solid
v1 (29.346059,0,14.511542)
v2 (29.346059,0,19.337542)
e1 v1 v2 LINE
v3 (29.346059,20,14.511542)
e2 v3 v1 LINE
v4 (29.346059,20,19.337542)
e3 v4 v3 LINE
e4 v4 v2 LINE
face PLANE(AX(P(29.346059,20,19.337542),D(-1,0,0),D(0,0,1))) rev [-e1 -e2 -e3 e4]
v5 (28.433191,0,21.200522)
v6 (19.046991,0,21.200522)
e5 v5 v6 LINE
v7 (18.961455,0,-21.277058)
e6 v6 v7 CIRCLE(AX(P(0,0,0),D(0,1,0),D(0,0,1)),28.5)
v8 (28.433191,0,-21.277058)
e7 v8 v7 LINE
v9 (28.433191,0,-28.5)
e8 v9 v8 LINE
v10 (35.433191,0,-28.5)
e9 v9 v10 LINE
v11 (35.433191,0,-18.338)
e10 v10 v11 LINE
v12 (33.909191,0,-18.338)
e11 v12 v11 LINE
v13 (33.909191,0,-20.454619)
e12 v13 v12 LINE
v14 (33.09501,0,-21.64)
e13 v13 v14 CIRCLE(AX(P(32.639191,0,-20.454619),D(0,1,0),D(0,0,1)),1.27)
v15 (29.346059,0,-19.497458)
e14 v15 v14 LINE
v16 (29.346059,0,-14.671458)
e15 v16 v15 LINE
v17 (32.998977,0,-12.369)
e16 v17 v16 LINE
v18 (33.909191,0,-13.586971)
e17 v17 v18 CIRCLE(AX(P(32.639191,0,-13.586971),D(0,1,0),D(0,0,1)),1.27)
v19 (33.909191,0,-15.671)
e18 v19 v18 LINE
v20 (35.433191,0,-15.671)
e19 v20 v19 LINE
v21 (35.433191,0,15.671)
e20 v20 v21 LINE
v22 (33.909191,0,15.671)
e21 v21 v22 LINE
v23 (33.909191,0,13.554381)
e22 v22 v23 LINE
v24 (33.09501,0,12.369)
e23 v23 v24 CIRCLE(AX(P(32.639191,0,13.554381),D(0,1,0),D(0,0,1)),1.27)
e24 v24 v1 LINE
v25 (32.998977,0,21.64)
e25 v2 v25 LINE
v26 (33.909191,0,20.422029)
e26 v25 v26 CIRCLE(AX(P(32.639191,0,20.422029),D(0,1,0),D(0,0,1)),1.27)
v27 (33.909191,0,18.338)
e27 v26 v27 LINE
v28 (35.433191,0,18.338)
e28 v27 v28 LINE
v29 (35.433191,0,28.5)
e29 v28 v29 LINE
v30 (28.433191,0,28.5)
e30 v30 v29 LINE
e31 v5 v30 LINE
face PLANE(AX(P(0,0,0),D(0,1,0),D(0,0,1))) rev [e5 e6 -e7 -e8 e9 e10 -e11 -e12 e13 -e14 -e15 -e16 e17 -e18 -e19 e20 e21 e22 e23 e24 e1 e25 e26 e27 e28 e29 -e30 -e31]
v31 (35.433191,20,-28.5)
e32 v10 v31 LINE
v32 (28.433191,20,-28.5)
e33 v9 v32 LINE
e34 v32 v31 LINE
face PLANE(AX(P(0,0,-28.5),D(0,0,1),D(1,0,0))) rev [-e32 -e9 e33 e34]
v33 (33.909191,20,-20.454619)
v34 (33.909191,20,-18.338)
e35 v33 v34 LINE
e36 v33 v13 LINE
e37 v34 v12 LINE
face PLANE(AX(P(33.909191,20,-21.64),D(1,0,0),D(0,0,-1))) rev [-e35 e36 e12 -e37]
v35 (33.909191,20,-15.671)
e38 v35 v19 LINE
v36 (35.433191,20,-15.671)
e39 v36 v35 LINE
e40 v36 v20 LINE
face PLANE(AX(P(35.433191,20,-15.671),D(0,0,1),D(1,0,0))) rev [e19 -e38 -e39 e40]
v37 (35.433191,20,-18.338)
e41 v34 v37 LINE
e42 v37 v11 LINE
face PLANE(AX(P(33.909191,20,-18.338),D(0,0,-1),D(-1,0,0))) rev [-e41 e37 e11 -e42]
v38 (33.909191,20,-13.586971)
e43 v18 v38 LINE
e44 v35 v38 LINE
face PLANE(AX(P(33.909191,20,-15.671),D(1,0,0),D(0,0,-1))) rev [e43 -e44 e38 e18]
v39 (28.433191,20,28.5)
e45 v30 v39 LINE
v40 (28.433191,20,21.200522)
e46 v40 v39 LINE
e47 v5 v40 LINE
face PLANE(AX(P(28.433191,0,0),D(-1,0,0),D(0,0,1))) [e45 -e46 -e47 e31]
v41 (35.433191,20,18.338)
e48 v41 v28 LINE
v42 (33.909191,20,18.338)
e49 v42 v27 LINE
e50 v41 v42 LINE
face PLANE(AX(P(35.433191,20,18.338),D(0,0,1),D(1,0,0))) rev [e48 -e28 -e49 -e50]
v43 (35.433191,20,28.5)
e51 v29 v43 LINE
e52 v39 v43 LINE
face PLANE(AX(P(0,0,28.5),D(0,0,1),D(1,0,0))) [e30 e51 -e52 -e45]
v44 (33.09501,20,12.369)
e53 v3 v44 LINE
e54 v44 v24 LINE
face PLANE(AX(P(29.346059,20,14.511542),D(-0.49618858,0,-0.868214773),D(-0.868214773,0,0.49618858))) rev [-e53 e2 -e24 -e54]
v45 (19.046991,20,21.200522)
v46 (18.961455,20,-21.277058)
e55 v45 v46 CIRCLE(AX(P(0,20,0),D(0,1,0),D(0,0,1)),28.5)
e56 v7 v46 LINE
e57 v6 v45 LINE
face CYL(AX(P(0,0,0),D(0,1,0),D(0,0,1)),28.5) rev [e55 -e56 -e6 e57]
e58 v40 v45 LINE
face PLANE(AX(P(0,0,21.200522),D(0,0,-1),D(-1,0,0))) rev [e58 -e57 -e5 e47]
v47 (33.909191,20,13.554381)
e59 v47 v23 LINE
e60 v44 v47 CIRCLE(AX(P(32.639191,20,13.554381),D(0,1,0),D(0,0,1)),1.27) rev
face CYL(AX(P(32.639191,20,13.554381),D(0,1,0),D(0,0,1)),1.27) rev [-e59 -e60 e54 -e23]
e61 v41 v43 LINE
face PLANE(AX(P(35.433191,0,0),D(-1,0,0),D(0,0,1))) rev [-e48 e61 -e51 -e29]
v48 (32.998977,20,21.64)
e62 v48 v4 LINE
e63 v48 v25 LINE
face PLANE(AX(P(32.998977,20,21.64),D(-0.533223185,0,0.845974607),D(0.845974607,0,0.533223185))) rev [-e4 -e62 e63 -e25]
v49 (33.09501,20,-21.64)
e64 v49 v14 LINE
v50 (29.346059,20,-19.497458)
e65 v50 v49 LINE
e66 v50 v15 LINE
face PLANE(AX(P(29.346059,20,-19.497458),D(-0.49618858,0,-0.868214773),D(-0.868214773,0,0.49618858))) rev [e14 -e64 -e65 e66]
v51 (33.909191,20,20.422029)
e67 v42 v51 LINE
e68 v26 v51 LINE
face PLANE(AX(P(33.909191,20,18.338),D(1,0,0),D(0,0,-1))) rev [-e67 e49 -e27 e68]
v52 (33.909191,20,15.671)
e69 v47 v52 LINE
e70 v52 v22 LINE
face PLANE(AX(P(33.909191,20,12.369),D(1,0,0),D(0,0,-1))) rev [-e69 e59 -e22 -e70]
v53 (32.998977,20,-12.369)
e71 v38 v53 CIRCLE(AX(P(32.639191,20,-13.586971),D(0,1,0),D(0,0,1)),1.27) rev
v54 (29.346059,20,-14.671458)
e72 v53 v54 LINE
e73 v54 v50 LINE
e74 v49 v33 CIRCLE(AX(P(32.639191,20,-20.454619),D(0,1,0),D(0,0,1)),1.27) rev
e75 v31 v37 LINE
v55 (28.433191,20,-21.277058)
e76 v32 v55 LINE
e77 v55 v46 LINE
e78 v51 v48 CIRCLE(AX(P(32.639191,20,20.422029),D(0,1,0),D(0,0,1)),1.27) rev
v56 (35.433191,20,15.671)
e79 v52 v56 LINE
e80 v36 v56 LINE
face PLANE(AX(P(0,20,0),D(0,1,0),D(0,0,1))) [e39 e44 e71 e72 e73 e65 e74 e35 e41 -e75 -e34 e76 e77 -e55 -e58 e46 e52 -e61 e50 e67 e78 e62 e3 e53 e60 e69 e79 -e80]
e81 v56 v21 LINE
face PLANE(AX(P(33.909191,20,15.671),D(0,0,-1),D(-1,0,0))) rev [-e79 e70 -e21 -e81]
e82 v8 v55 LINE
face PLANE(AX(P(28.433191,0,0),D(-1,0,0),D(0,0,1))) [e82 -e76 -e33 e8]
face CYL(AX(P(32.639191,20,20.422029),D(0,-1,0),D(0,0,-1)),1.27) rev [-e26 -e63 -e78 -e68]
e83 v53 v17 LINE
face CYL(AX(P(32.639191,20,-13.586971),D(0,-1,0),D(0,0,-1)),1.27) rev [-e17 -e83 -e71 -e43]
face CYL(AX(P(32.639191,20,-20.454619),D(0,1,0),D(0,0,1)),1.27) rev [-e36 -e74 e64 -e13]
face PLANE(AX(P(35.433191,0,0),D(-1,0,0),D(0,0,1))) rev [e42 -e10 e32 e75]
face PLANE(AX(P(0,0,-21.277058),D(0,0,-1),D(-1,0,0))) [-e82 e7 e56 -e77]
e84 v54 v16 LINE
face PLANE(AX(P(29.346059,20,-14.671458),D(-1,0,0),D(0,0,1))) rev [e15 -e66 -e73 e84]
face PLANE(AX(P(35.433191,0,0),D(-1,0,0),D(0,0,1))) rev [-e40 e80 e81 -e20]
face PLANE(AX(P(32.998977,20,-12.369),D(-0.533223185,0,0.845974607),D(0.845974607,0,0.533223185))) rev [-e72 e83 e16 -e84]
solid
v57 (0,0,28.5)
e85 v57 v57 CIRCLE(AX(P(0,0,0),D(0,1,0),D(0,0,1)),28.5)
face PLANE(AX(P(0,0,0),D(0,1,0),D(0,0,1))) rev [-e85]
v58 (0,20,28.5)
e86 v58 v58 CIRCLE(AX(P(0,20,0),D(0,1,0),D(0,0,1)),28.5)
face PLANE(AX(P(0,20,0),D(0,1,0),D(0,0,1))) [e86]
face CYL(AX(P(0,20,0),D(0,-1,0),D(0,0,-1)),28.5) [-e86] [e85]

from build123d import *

# Parameters (mm, degrees)
SKETCH1_R               = 28.5
BOSS_EXTRUDE1_DEPTH     = 20
BOSS_EXTRUDE3_DEPTH     = 20
CUT_EXTRUDE1_DEPTH      = 50.676564409
CUT_EXTRUDE1_DEPTH_BACK = 50.676564409
CUT_EXTRUDE2_DEPTH      = 50.676564409
CUT_EXTRUDE2_DEPTH_BACK = 50.676564409
FILLET1_R               = 1.27


with BuildPart() as part:
    # Sketch1 → Boss-Extrude1 (new body)
    with BuildSketch(Plane(origin=(0, 0, 0), x_dir=(1, 0, 0), z_dir=(0, 1, 0))):
        with Locations(Location((0, 0, 0), (0, 0, 270))):
            Circle(SKETCH1_R)
    extrude(amount=BOSS_EXTRUDE1_DEPTH)


with BuildPart() as body_2:
    # Sketch2 → Boss-Extrude3 (new body)
    with BuildSketch(Plane(origin=(0, 20, 0), x_dir=(1, 0, 0), z_dir=(0, 1, 0))):
        with BuildLine():
            Line((35.433191382, 28.5), (28.433191382, 28.5))
            Line((28.433191382, 28.5), (28.433191382, 21.277058423))
            Line((28.433191382, 21.277058423), (18.961455241, 21.277058423))
            ThreePointArc((18.961455241, 21.277058423), (28.499942219, 0.057389264), (19.046990751, -21.200522242))
            Line((19.046990751, -21.200522242), (28.433191382, -21.200522242))
            Line((28.433191382, -21.200522242), (28.433191382, -28.5))
            Line((28.433191382, -28.5), (35.433191382, -28.5))
            Line((35.433191382, -28.5), (35.433191382, 28.5))
        make_face()
    extrude(amount=-BOSS_EXTRUDE3_DEPTH)

    # Sketch6 → Cut-Extrude1 (cut, two sides: drawn at the far end of the back side and taken through both)
    with BuildSketch(Plane.XZ.offset(-CUT_EXTRUDE1_DEPTH_BACK)):
        Polygon((35.433191382, 18.338), (33.909191382, 18.338), (33.909191382, 21.64), (32.998977436, 21.64), (29.346059083, 19.337542289), (29.346059083, 14.511542289), (33.095010475, 12.369), (33.909191382, 12.369), (33.909191382, 15.671), (35.433191382, 15.671), align=None)
    extrude(amount=CUT_EXTRUDE1_DEPTH + CUT_EXTRUDE1_DEPTH_BACK, mode=Mode.SUBTRACT)

    # Sketch8 → Cut-Extrude2 (cut, two sides: drawn at the far end of the back side and taken through both)
    with BuildSketch(Plane.XZ.offset(-CUT_EXTRUDE2_DEPTH_BACK)):
        Polygon((35.433191382, -15.671), (33.909191382, -15.671), (33.909191382, -12.369), (32.998977436, -12.369), (29.346059083, -14.671457711), (29.346059083, -19.497457711), (33.095010475, -21.64), (33.909191382, -21.64), (33.909191382, -18.338), (35.433191382, -18.338), align=None)
    extrude(amount=CUT_EXTRUDE2_DEPTH + CUT_EXTRUDE2_DEPTH_BACK, mode=Mode.SUBTRACT)

    # Fillet1
    # the kernel refuses this fillet: 1.27 mm, written as the material it adds along each edge
    with BuildSketch(Plane(origin=(33.909191382, 20, -21.64), x_dir=(0, 0, 1), z_dir=(0, -1, 0)), Plane(origin=(33.909191382, 20, 12.369), x_dir=(0, 0, 1), z_dir=(0, -1, 0))) as fillet1_piece_1:
        with BuildLine():
            CenterArc((1.185381354, 1.27), FILLET1_R, 201.033434492, 68.966565508)
            Line((0, 0.814180907), (-0.023707627, 0.805064525))
            ThreePointArc((-0.023707627, 0.805064525), (-0.0254, 0.407090453), (-0.0254, 0))
            Line((-0.0254, 0), (0, -0.0254))
            Line((0, -0.0254), (1.185381354, -0.0254))
            Line((1.185381354, -0.0254), (1.185381354, 0))
        make_face()
    extrude(amount=20)
    with BuildSketch(Plane(origin=(33.909191382, 20, -12.369), x_dir=(-1, 0, 0), z_dir=(0, -1, 0)), Plane(origin=(33.909191382, 20, 21.64), x_dir=(-1, 0, 0), z_dir=(0, -1, 0))) as fillet1_piece_2:
        with BuildLine():
            CenterArc((1.27, 1.217971262), FILLET1_R, 180, 73.542974509)
            Line((0, 1.217971262), (-0.0254, 1.217971262))
            Line((-0.0254, 1.217971262), (-0.0254, 0))
            Line((-0.0254, 0), (0, -0.0254))
            ThreePointArc((0, -0.0254), (0.455106973, -0.0254), (0.903018225, -0.024359425))
            Line((0.903018225, -0.024359425), (0.910213946, 0))
        make_face()
    extrude(amount=20)


solid = Compound([part.part, body_2.part])
